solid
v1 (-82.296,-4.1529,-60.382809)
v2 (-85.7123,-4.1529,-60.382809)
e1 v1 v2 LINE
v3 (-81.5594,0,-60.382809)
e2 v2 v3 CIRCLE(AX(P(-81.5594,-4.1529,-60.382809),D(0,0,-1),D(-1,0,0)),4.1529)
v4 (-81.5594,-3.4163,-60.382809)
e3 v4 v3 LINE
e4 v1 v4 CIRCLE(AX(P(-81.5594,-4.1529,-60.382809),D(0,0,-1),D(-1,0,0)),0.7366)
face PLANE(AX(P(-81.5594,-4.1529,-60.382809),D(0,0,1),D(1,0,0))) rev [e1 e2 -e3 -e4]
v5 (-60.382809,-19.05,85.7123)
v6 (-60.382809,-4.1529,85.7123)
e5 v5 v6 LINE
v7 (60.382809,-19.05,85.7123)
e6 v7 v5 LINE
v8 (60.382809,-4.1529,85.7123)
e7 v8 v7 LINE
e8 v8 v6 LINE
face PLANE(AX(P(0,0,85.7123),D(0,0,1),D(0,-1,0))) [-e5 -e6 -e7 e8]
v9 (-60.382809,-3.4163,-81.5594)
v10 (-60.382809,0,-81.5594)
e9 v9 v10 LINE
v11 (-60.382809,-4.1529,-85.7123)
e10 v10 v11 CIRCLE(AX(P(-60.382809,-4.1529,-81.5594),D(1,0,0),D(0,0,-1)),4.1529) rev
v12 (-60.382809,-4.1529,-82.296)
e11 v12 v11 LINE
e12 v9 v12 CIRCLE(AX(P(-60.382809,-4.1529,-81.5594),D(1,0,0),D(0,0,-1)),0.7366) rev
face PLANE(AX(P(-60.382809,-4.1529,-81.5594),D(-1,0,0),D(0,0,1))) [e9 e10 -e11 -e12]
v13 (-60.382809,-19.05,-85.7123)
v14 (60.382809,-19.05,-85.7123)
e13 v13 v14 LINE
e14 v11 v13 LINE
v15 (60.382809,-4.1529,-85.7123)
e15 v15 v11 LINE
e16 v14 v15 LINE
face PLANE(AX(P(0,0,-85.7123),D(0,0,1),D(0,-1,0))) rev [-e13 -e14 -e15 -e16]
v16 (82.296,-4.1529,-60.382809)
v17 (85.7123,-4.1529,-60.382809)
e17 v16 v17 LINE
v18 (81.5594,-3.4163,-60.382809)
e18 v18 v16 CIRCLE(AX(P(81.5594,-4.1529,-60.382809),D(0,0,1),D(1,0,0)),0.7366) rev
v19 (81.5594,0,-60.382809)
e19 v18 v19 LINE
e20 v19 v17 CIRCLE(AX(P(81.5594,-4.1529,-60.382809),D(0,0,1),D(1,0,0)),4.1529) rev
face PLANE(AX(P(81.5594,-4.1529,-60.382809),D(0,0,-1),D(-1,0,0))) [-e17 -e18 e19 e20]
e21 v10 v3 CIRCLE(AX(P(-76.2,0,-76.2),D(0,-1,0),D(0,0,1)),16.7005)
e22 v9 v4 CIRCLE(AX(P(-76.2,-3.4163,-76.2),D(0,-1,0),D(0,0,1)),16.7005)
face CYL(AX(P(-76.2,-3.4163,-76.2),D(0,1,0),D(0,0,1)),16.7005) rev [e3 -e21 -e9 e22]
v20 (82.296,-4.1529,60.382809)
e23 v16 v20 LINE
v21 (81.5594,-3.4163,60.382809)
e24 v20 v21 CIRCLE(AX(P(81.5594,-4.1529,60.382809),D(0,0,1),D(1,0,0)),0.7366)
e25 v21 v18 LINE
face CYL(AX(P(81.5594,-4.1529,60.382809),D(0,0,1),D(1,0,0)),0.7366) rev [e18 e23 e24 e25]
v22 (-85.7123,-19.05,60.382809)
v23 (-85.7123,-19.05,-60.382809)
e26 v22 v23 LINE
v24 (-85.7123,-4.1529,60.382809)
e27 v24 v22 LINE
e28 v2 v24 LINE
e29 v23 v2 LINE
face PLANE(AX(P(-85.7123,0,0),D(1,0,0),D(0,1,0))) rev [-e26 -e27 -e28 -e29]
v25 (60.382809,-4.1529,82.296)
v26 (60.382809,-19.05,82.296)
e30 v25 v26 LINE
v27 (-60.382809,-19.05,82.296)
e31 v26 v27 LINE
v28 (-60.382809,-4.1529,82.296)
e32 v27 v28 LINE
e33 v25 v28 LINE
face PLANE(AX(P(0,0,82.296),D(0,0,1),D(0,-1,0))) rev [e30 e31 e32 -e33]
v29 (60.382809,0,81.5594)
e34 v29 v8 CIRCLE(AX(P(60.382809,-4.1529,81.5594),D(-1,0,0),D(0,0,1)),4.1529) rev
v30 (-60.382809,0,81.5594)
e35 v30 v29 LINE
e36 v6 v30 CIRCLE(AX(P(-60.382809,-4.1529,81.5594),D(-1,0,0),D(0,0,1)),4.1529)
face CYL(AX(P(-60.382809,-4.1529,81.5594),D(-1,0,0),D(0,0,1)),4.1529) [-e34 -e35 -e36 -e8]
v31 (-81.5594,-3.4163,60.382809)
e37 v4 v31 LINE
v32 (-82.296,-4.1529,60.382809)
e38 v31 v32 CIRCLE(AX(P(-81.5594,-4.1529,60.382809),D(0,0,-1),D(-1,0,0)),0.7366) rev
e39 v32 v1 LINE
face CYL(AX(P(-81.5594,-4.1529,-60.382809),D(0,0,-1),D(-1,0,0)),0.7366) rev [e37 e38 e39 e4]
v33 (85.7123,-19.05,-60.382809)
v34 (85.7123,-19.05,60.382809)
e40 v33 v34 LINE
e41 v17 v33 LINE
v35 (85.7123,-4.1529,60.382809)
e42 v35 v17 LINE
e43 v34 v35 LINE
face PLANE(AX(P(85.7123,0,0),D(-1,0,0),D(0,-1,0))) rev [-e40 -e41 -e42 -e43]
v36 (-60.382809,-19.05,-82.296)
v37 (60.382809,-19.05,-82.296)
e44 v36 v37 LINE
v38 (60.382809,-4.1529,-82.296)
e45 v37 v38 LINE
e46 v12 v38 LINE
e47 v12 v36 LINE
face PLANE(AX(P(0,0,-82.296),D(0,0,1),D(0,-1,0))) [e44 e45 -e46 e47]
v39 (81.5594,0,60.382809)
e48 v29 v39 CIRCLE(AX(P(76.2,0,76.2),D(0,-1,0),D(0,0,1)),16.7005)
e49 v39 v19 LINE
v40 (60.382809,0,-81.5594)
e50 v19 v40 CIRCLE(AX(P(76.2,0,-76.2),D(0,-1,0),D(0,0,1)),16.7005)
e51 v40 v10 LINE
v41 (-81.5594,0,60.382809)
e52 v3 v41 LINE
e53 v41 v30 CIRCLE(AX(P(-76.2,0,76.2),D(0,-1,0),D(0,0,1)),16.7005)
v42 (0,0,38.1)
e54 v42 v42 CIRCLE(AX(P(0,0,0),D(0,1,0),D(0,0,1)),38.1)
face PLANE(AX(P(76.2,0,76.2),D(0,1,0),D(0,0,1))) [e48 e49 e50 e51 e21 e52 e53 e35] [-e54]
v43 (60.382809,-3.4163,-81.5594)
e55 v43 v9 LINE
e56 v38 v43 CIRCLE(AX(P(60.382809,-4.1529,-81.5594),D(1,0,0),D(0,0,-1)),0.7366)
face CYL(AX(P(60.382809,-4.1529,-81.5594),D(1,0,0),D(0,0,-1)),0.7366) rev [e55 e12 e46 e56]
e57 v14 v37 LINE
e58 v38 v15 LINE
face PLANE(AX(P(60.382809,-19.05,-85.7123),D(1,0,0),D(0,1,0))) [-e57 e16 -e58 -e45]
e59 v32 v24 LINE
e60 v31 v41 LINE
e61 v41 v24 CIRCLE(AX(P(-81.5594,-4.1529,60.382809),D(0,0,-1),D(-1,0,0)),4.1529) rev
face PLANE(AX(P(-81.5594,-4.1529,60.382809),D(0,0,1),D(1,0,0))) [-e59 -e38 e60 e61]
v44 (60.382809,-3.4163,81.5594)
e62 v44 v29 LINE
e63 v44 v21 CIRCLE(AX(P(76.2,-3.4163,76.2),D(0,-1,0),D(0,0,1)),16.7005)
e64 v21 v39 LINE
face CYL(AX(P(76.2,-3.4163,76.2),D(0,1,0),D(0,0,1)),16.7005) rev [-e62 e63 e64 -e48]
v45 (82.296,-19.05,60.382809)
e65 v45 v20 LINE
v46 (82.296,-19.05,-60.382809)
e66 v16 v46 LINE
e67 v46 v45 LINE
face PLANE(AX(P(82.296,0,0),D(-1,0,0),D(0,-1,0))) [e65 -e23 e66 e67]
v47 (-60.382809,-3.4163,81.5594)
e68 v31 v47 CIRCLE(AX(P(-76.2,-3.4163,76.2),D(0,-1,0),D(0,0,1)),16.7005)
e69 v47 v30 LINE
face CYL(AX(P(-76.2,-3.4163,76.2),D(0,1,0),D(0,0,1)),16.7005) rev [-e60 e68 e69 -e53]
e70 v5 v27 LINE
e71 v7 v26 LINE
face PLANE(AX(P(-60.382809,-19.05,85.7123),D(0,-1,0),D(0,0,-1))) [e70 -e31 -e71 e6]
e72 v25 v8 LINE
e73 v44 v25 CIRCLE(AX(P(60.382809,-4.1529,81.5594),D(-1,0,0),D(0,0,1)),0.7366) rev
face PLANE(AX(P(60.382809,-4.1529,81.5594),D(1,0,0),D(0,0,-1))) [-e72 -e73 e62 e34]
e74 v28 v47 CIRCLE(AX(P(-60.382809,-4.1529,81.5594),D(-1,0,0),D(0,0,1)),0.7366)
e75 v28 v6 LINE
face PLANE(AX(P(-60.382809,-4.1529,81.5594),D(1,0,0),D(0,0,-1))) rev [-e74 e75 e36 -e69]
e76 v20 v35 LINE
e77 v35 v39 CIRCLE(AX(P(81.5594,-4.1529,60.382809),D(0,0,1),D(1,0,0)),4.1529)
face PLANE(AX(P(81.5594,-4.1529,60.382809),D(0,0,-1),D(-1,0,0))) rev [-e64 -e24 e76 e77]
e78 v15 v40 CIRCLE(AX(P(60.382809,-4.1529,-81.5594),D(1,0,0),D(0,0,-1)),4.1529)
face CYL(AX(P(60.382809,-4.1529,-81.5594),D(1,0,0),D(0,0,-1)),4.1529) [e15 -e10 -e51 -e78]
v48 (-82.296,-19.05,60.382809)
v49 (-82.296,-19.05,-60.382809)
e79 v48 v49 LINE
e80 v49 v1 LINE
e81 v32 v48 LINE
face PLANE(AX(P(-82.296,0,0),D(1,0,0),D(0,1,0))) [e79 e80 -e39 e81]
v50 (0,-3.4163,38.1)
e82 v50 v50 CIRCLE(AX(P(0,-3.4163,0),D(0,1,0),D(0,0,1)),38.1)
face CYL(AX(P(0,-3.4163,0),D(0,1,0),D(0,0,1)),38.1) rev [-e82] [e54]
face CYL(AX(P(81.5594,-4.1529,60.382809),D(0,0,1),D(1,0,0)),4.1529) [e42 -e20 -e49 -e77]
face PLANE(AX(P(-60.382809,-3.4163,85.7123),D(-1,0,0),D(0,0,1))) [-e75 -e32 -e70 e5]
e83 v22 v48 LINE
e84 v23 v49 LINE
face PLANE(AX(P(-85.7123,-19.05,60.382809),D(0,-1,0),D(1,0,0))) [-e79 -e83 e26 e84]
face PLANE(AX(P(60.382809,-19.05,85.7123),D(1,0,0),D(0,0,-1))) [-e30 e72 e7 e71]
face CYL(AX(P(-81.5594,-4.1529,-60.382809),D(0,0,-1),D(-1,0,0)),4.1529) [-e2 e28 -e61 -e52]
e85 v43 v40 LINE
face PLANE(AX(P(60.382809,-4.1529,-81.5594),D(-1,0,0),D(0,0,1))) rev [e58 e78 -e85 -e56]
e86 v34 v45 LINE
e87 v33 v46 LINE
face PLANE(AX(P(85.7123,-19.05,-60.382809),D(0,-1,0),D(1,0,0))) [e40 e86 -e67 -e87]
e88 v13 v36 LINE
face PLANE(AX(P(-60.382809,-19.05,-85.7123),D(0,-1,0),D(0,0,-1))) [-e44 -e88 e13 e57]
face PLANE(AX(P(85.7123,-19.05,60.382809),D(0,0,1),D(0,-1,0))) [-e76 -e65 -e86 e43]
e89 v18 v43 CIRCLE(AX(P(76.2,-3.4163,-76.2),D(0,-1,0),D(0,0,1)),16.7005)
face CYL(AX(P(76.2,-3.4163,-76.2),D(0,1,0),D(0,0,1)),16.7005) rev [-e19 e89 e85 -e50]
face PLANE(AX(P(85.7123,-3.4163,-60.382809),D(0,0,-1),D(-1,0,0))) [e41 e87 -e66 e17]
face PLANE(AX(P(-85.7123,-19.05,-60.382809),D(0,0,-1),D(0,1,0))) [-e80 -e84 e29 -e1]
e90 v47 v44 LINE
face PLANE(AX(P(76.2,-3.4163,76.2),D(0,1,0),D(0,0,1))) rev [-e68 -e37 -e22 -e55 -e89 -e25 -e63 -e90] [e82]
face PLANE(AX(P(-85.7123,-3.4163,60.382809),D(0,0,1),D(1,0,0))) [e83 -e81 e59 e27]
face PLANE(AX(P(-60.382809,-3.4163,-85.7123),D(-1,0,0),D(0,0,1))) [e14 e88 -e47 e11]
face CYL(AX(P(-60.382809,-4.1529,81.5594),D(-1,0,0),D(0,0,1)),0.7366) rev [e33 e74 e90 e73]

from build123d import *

# Parameters (mm, degrees)
SKETCH3_R                 = 38.1
BASE_FLANGE1_DEPTH        = 3.4163
EDGE_FLANGE1_DEPTH        = 120.765617952
EDGE_FLANGE1_BEND_DEPTH   = 120.765617952
EDGE_FLANGE1_BEND_2_DEPTH = 120.765617952
EDGE_FLANGE1_BEND_3_DEPTH = 120.765617952


# Sheet-metal steps are written as plain solids
with BuildPart() as part:
    # Sketch3 → Base-Flange1 (new body)
    with BuildSketch(Plane(origin=(0, 0, 0), x_dir=(1, 0, 0), z_dir=(0, 1, 0))):
        with BuildLine():
            Line((-60.382808976, 81.5594), (60.382808976, 81.5594))
            ThreePointArc((60.382808976, 81.5594), (64.390963201, 64.390963201), (81.5594, 60.382808976))
            Line((81.5594, 60.382808976), (81.5594, -60.382808976))
            ThreePointArc((81.5594, -60.382808976), (64.390963201, -64.390963201), (60.382808976, -81.5594))
            Line((60.382808976, -81.5594), (-60.382808976, -81.5594))
            ThreePointArc((-60.382808976, -81.5594), (-64.390963201, -64.390963201), (-81.5594, -60.382808976))
            Line((-81.5594, -60.382808976), (-81.5594, 60.382808976))
            ThreePointArc((-81.5594, 60.382808976), (-64.390963201, 64.390963201), (-60.382808976, 81.5594))
        make_face()
        with Locations(Location((0, 0, 0), (0, 0, 270))):
            Circle(SKETCH3_R, mode=Mode.SUBTRACT)
    extrude(amount=-BASE_FLANGE1_DEPTH)

    # Edge-Flange1 section (across the edge) → Edge-Flange1 (add)
    with BuildSketch(Plane(origin=(60.382808976, -3.4163, 82.296), x_dir=(0, 0, -1), z_dir=(-1, 0, 0))):
        with BuildLine():
            Line((-3.4163, 0.7366), (-3.4163, 15.6337))
            Line((-3.4163, 15.6337), (0, 15.6337))
            Line((0, 15.6337), (0, 0.7366))
            ThreePointArc((0, 0.7366), (0.215745145, 0.215745145), (0.7366, 0))
            Line((0.7366, 0), (0.7366, -3.4163))
            ThreePointArc((0.7366, -3.4163), (-2.199943752, -2.199943752), (-3.4163, 0.7366))
        make_face()
    extrude(amount=EDGE_FLANGE1_DEPTH)

    # Edge-Flange1 section 2 (across the edge) → Edge-Flange1 bend (add)
    with BuildSketch(Plane(origin=(82.296, -3.4163, -60.382808976), x_dir=(-1, 0, 0), z_dir=(0, 0, 1))):
        with BuildLine():
            Line((-3.4163, 0.7366), (-3.4163, 15.6337))
            Line((-3.4163, 15.6337), (0, 15.6337))
            Line((0, 15.6337), (0, 0.7366))
            ThreePointArc((0, 0.7366), (0.215745145, 0.215745145), (0.7366, 0))
            Line((0.7366, 0), (0.7366, -3.4163))
            ThreePointArc((0.7366, -3.4163), (-2.199943752, -2.199943752), (-3.4163, 0.7366))
        make_face()
    extrude(amount=EDGE_FLANGE1_BEND_DEPTH)

    # Edge-Flange1 section 3 (across the edge) → Edge-Flange1 bend 2 (add)
    with BuildSketch(Plane(origin=(-60.382808976, -3.4163, -82.296), x_dir=(0, 0, 1), z_dir=(1, 0, 0))):
        with BuildLine():
            Line((-3.4163, 0.7366), (-3.4163, 15.6337))
            Line((-3.4163, 15.6337), (0, 15.6337))
            Line((0, 15.6337), (0, 0.7366))
            ThreePointArc((0, 0.7366), (0.215745145, 0.215745145), (0.7366, 0))
            Line((0.7366, 0), (0.7366, -3.4163))
            ThreePointArc((0.7366, -3.4163), (-2.199943752, -2.199943752), (-3.4163, 0.7366))
        make_face()
    extrude(amount=EDGE_FLANGE1_BEND_2_DEPTH)

    # Edge-Flange1 section 4 (across the edge) → Edge-Flange1 bend 3 (add)
    with BuildSketch(Plane(origin=(-82.296, -3.4163, 60.382808976), x_dir=(1, 0, 0), z_dir=(0, 0, -1))):
        with BuildLine():
            Line((-3.4163, 0.7366), (-3.4163, 15.6337))
            Line((-3.4163, 15.6337), (0, 15.6337))
            Line((0, 15.6337), (0, 0.7366))
            ThreePointArc((0, 0.7366), (0.215745145, 0.215745145), (0.7366, 0))
            Line((0.7366, 0), (0.7366, -3.4163))
            ThreePointArc((0.7366, -3.4163), (-2.199943752, -2.199943752), (-3.4163, 0.7366))
        make_face()
    extrude(amount=EDGE_FLANGE1_BEND_3_DEPTH)


solid = part.part
